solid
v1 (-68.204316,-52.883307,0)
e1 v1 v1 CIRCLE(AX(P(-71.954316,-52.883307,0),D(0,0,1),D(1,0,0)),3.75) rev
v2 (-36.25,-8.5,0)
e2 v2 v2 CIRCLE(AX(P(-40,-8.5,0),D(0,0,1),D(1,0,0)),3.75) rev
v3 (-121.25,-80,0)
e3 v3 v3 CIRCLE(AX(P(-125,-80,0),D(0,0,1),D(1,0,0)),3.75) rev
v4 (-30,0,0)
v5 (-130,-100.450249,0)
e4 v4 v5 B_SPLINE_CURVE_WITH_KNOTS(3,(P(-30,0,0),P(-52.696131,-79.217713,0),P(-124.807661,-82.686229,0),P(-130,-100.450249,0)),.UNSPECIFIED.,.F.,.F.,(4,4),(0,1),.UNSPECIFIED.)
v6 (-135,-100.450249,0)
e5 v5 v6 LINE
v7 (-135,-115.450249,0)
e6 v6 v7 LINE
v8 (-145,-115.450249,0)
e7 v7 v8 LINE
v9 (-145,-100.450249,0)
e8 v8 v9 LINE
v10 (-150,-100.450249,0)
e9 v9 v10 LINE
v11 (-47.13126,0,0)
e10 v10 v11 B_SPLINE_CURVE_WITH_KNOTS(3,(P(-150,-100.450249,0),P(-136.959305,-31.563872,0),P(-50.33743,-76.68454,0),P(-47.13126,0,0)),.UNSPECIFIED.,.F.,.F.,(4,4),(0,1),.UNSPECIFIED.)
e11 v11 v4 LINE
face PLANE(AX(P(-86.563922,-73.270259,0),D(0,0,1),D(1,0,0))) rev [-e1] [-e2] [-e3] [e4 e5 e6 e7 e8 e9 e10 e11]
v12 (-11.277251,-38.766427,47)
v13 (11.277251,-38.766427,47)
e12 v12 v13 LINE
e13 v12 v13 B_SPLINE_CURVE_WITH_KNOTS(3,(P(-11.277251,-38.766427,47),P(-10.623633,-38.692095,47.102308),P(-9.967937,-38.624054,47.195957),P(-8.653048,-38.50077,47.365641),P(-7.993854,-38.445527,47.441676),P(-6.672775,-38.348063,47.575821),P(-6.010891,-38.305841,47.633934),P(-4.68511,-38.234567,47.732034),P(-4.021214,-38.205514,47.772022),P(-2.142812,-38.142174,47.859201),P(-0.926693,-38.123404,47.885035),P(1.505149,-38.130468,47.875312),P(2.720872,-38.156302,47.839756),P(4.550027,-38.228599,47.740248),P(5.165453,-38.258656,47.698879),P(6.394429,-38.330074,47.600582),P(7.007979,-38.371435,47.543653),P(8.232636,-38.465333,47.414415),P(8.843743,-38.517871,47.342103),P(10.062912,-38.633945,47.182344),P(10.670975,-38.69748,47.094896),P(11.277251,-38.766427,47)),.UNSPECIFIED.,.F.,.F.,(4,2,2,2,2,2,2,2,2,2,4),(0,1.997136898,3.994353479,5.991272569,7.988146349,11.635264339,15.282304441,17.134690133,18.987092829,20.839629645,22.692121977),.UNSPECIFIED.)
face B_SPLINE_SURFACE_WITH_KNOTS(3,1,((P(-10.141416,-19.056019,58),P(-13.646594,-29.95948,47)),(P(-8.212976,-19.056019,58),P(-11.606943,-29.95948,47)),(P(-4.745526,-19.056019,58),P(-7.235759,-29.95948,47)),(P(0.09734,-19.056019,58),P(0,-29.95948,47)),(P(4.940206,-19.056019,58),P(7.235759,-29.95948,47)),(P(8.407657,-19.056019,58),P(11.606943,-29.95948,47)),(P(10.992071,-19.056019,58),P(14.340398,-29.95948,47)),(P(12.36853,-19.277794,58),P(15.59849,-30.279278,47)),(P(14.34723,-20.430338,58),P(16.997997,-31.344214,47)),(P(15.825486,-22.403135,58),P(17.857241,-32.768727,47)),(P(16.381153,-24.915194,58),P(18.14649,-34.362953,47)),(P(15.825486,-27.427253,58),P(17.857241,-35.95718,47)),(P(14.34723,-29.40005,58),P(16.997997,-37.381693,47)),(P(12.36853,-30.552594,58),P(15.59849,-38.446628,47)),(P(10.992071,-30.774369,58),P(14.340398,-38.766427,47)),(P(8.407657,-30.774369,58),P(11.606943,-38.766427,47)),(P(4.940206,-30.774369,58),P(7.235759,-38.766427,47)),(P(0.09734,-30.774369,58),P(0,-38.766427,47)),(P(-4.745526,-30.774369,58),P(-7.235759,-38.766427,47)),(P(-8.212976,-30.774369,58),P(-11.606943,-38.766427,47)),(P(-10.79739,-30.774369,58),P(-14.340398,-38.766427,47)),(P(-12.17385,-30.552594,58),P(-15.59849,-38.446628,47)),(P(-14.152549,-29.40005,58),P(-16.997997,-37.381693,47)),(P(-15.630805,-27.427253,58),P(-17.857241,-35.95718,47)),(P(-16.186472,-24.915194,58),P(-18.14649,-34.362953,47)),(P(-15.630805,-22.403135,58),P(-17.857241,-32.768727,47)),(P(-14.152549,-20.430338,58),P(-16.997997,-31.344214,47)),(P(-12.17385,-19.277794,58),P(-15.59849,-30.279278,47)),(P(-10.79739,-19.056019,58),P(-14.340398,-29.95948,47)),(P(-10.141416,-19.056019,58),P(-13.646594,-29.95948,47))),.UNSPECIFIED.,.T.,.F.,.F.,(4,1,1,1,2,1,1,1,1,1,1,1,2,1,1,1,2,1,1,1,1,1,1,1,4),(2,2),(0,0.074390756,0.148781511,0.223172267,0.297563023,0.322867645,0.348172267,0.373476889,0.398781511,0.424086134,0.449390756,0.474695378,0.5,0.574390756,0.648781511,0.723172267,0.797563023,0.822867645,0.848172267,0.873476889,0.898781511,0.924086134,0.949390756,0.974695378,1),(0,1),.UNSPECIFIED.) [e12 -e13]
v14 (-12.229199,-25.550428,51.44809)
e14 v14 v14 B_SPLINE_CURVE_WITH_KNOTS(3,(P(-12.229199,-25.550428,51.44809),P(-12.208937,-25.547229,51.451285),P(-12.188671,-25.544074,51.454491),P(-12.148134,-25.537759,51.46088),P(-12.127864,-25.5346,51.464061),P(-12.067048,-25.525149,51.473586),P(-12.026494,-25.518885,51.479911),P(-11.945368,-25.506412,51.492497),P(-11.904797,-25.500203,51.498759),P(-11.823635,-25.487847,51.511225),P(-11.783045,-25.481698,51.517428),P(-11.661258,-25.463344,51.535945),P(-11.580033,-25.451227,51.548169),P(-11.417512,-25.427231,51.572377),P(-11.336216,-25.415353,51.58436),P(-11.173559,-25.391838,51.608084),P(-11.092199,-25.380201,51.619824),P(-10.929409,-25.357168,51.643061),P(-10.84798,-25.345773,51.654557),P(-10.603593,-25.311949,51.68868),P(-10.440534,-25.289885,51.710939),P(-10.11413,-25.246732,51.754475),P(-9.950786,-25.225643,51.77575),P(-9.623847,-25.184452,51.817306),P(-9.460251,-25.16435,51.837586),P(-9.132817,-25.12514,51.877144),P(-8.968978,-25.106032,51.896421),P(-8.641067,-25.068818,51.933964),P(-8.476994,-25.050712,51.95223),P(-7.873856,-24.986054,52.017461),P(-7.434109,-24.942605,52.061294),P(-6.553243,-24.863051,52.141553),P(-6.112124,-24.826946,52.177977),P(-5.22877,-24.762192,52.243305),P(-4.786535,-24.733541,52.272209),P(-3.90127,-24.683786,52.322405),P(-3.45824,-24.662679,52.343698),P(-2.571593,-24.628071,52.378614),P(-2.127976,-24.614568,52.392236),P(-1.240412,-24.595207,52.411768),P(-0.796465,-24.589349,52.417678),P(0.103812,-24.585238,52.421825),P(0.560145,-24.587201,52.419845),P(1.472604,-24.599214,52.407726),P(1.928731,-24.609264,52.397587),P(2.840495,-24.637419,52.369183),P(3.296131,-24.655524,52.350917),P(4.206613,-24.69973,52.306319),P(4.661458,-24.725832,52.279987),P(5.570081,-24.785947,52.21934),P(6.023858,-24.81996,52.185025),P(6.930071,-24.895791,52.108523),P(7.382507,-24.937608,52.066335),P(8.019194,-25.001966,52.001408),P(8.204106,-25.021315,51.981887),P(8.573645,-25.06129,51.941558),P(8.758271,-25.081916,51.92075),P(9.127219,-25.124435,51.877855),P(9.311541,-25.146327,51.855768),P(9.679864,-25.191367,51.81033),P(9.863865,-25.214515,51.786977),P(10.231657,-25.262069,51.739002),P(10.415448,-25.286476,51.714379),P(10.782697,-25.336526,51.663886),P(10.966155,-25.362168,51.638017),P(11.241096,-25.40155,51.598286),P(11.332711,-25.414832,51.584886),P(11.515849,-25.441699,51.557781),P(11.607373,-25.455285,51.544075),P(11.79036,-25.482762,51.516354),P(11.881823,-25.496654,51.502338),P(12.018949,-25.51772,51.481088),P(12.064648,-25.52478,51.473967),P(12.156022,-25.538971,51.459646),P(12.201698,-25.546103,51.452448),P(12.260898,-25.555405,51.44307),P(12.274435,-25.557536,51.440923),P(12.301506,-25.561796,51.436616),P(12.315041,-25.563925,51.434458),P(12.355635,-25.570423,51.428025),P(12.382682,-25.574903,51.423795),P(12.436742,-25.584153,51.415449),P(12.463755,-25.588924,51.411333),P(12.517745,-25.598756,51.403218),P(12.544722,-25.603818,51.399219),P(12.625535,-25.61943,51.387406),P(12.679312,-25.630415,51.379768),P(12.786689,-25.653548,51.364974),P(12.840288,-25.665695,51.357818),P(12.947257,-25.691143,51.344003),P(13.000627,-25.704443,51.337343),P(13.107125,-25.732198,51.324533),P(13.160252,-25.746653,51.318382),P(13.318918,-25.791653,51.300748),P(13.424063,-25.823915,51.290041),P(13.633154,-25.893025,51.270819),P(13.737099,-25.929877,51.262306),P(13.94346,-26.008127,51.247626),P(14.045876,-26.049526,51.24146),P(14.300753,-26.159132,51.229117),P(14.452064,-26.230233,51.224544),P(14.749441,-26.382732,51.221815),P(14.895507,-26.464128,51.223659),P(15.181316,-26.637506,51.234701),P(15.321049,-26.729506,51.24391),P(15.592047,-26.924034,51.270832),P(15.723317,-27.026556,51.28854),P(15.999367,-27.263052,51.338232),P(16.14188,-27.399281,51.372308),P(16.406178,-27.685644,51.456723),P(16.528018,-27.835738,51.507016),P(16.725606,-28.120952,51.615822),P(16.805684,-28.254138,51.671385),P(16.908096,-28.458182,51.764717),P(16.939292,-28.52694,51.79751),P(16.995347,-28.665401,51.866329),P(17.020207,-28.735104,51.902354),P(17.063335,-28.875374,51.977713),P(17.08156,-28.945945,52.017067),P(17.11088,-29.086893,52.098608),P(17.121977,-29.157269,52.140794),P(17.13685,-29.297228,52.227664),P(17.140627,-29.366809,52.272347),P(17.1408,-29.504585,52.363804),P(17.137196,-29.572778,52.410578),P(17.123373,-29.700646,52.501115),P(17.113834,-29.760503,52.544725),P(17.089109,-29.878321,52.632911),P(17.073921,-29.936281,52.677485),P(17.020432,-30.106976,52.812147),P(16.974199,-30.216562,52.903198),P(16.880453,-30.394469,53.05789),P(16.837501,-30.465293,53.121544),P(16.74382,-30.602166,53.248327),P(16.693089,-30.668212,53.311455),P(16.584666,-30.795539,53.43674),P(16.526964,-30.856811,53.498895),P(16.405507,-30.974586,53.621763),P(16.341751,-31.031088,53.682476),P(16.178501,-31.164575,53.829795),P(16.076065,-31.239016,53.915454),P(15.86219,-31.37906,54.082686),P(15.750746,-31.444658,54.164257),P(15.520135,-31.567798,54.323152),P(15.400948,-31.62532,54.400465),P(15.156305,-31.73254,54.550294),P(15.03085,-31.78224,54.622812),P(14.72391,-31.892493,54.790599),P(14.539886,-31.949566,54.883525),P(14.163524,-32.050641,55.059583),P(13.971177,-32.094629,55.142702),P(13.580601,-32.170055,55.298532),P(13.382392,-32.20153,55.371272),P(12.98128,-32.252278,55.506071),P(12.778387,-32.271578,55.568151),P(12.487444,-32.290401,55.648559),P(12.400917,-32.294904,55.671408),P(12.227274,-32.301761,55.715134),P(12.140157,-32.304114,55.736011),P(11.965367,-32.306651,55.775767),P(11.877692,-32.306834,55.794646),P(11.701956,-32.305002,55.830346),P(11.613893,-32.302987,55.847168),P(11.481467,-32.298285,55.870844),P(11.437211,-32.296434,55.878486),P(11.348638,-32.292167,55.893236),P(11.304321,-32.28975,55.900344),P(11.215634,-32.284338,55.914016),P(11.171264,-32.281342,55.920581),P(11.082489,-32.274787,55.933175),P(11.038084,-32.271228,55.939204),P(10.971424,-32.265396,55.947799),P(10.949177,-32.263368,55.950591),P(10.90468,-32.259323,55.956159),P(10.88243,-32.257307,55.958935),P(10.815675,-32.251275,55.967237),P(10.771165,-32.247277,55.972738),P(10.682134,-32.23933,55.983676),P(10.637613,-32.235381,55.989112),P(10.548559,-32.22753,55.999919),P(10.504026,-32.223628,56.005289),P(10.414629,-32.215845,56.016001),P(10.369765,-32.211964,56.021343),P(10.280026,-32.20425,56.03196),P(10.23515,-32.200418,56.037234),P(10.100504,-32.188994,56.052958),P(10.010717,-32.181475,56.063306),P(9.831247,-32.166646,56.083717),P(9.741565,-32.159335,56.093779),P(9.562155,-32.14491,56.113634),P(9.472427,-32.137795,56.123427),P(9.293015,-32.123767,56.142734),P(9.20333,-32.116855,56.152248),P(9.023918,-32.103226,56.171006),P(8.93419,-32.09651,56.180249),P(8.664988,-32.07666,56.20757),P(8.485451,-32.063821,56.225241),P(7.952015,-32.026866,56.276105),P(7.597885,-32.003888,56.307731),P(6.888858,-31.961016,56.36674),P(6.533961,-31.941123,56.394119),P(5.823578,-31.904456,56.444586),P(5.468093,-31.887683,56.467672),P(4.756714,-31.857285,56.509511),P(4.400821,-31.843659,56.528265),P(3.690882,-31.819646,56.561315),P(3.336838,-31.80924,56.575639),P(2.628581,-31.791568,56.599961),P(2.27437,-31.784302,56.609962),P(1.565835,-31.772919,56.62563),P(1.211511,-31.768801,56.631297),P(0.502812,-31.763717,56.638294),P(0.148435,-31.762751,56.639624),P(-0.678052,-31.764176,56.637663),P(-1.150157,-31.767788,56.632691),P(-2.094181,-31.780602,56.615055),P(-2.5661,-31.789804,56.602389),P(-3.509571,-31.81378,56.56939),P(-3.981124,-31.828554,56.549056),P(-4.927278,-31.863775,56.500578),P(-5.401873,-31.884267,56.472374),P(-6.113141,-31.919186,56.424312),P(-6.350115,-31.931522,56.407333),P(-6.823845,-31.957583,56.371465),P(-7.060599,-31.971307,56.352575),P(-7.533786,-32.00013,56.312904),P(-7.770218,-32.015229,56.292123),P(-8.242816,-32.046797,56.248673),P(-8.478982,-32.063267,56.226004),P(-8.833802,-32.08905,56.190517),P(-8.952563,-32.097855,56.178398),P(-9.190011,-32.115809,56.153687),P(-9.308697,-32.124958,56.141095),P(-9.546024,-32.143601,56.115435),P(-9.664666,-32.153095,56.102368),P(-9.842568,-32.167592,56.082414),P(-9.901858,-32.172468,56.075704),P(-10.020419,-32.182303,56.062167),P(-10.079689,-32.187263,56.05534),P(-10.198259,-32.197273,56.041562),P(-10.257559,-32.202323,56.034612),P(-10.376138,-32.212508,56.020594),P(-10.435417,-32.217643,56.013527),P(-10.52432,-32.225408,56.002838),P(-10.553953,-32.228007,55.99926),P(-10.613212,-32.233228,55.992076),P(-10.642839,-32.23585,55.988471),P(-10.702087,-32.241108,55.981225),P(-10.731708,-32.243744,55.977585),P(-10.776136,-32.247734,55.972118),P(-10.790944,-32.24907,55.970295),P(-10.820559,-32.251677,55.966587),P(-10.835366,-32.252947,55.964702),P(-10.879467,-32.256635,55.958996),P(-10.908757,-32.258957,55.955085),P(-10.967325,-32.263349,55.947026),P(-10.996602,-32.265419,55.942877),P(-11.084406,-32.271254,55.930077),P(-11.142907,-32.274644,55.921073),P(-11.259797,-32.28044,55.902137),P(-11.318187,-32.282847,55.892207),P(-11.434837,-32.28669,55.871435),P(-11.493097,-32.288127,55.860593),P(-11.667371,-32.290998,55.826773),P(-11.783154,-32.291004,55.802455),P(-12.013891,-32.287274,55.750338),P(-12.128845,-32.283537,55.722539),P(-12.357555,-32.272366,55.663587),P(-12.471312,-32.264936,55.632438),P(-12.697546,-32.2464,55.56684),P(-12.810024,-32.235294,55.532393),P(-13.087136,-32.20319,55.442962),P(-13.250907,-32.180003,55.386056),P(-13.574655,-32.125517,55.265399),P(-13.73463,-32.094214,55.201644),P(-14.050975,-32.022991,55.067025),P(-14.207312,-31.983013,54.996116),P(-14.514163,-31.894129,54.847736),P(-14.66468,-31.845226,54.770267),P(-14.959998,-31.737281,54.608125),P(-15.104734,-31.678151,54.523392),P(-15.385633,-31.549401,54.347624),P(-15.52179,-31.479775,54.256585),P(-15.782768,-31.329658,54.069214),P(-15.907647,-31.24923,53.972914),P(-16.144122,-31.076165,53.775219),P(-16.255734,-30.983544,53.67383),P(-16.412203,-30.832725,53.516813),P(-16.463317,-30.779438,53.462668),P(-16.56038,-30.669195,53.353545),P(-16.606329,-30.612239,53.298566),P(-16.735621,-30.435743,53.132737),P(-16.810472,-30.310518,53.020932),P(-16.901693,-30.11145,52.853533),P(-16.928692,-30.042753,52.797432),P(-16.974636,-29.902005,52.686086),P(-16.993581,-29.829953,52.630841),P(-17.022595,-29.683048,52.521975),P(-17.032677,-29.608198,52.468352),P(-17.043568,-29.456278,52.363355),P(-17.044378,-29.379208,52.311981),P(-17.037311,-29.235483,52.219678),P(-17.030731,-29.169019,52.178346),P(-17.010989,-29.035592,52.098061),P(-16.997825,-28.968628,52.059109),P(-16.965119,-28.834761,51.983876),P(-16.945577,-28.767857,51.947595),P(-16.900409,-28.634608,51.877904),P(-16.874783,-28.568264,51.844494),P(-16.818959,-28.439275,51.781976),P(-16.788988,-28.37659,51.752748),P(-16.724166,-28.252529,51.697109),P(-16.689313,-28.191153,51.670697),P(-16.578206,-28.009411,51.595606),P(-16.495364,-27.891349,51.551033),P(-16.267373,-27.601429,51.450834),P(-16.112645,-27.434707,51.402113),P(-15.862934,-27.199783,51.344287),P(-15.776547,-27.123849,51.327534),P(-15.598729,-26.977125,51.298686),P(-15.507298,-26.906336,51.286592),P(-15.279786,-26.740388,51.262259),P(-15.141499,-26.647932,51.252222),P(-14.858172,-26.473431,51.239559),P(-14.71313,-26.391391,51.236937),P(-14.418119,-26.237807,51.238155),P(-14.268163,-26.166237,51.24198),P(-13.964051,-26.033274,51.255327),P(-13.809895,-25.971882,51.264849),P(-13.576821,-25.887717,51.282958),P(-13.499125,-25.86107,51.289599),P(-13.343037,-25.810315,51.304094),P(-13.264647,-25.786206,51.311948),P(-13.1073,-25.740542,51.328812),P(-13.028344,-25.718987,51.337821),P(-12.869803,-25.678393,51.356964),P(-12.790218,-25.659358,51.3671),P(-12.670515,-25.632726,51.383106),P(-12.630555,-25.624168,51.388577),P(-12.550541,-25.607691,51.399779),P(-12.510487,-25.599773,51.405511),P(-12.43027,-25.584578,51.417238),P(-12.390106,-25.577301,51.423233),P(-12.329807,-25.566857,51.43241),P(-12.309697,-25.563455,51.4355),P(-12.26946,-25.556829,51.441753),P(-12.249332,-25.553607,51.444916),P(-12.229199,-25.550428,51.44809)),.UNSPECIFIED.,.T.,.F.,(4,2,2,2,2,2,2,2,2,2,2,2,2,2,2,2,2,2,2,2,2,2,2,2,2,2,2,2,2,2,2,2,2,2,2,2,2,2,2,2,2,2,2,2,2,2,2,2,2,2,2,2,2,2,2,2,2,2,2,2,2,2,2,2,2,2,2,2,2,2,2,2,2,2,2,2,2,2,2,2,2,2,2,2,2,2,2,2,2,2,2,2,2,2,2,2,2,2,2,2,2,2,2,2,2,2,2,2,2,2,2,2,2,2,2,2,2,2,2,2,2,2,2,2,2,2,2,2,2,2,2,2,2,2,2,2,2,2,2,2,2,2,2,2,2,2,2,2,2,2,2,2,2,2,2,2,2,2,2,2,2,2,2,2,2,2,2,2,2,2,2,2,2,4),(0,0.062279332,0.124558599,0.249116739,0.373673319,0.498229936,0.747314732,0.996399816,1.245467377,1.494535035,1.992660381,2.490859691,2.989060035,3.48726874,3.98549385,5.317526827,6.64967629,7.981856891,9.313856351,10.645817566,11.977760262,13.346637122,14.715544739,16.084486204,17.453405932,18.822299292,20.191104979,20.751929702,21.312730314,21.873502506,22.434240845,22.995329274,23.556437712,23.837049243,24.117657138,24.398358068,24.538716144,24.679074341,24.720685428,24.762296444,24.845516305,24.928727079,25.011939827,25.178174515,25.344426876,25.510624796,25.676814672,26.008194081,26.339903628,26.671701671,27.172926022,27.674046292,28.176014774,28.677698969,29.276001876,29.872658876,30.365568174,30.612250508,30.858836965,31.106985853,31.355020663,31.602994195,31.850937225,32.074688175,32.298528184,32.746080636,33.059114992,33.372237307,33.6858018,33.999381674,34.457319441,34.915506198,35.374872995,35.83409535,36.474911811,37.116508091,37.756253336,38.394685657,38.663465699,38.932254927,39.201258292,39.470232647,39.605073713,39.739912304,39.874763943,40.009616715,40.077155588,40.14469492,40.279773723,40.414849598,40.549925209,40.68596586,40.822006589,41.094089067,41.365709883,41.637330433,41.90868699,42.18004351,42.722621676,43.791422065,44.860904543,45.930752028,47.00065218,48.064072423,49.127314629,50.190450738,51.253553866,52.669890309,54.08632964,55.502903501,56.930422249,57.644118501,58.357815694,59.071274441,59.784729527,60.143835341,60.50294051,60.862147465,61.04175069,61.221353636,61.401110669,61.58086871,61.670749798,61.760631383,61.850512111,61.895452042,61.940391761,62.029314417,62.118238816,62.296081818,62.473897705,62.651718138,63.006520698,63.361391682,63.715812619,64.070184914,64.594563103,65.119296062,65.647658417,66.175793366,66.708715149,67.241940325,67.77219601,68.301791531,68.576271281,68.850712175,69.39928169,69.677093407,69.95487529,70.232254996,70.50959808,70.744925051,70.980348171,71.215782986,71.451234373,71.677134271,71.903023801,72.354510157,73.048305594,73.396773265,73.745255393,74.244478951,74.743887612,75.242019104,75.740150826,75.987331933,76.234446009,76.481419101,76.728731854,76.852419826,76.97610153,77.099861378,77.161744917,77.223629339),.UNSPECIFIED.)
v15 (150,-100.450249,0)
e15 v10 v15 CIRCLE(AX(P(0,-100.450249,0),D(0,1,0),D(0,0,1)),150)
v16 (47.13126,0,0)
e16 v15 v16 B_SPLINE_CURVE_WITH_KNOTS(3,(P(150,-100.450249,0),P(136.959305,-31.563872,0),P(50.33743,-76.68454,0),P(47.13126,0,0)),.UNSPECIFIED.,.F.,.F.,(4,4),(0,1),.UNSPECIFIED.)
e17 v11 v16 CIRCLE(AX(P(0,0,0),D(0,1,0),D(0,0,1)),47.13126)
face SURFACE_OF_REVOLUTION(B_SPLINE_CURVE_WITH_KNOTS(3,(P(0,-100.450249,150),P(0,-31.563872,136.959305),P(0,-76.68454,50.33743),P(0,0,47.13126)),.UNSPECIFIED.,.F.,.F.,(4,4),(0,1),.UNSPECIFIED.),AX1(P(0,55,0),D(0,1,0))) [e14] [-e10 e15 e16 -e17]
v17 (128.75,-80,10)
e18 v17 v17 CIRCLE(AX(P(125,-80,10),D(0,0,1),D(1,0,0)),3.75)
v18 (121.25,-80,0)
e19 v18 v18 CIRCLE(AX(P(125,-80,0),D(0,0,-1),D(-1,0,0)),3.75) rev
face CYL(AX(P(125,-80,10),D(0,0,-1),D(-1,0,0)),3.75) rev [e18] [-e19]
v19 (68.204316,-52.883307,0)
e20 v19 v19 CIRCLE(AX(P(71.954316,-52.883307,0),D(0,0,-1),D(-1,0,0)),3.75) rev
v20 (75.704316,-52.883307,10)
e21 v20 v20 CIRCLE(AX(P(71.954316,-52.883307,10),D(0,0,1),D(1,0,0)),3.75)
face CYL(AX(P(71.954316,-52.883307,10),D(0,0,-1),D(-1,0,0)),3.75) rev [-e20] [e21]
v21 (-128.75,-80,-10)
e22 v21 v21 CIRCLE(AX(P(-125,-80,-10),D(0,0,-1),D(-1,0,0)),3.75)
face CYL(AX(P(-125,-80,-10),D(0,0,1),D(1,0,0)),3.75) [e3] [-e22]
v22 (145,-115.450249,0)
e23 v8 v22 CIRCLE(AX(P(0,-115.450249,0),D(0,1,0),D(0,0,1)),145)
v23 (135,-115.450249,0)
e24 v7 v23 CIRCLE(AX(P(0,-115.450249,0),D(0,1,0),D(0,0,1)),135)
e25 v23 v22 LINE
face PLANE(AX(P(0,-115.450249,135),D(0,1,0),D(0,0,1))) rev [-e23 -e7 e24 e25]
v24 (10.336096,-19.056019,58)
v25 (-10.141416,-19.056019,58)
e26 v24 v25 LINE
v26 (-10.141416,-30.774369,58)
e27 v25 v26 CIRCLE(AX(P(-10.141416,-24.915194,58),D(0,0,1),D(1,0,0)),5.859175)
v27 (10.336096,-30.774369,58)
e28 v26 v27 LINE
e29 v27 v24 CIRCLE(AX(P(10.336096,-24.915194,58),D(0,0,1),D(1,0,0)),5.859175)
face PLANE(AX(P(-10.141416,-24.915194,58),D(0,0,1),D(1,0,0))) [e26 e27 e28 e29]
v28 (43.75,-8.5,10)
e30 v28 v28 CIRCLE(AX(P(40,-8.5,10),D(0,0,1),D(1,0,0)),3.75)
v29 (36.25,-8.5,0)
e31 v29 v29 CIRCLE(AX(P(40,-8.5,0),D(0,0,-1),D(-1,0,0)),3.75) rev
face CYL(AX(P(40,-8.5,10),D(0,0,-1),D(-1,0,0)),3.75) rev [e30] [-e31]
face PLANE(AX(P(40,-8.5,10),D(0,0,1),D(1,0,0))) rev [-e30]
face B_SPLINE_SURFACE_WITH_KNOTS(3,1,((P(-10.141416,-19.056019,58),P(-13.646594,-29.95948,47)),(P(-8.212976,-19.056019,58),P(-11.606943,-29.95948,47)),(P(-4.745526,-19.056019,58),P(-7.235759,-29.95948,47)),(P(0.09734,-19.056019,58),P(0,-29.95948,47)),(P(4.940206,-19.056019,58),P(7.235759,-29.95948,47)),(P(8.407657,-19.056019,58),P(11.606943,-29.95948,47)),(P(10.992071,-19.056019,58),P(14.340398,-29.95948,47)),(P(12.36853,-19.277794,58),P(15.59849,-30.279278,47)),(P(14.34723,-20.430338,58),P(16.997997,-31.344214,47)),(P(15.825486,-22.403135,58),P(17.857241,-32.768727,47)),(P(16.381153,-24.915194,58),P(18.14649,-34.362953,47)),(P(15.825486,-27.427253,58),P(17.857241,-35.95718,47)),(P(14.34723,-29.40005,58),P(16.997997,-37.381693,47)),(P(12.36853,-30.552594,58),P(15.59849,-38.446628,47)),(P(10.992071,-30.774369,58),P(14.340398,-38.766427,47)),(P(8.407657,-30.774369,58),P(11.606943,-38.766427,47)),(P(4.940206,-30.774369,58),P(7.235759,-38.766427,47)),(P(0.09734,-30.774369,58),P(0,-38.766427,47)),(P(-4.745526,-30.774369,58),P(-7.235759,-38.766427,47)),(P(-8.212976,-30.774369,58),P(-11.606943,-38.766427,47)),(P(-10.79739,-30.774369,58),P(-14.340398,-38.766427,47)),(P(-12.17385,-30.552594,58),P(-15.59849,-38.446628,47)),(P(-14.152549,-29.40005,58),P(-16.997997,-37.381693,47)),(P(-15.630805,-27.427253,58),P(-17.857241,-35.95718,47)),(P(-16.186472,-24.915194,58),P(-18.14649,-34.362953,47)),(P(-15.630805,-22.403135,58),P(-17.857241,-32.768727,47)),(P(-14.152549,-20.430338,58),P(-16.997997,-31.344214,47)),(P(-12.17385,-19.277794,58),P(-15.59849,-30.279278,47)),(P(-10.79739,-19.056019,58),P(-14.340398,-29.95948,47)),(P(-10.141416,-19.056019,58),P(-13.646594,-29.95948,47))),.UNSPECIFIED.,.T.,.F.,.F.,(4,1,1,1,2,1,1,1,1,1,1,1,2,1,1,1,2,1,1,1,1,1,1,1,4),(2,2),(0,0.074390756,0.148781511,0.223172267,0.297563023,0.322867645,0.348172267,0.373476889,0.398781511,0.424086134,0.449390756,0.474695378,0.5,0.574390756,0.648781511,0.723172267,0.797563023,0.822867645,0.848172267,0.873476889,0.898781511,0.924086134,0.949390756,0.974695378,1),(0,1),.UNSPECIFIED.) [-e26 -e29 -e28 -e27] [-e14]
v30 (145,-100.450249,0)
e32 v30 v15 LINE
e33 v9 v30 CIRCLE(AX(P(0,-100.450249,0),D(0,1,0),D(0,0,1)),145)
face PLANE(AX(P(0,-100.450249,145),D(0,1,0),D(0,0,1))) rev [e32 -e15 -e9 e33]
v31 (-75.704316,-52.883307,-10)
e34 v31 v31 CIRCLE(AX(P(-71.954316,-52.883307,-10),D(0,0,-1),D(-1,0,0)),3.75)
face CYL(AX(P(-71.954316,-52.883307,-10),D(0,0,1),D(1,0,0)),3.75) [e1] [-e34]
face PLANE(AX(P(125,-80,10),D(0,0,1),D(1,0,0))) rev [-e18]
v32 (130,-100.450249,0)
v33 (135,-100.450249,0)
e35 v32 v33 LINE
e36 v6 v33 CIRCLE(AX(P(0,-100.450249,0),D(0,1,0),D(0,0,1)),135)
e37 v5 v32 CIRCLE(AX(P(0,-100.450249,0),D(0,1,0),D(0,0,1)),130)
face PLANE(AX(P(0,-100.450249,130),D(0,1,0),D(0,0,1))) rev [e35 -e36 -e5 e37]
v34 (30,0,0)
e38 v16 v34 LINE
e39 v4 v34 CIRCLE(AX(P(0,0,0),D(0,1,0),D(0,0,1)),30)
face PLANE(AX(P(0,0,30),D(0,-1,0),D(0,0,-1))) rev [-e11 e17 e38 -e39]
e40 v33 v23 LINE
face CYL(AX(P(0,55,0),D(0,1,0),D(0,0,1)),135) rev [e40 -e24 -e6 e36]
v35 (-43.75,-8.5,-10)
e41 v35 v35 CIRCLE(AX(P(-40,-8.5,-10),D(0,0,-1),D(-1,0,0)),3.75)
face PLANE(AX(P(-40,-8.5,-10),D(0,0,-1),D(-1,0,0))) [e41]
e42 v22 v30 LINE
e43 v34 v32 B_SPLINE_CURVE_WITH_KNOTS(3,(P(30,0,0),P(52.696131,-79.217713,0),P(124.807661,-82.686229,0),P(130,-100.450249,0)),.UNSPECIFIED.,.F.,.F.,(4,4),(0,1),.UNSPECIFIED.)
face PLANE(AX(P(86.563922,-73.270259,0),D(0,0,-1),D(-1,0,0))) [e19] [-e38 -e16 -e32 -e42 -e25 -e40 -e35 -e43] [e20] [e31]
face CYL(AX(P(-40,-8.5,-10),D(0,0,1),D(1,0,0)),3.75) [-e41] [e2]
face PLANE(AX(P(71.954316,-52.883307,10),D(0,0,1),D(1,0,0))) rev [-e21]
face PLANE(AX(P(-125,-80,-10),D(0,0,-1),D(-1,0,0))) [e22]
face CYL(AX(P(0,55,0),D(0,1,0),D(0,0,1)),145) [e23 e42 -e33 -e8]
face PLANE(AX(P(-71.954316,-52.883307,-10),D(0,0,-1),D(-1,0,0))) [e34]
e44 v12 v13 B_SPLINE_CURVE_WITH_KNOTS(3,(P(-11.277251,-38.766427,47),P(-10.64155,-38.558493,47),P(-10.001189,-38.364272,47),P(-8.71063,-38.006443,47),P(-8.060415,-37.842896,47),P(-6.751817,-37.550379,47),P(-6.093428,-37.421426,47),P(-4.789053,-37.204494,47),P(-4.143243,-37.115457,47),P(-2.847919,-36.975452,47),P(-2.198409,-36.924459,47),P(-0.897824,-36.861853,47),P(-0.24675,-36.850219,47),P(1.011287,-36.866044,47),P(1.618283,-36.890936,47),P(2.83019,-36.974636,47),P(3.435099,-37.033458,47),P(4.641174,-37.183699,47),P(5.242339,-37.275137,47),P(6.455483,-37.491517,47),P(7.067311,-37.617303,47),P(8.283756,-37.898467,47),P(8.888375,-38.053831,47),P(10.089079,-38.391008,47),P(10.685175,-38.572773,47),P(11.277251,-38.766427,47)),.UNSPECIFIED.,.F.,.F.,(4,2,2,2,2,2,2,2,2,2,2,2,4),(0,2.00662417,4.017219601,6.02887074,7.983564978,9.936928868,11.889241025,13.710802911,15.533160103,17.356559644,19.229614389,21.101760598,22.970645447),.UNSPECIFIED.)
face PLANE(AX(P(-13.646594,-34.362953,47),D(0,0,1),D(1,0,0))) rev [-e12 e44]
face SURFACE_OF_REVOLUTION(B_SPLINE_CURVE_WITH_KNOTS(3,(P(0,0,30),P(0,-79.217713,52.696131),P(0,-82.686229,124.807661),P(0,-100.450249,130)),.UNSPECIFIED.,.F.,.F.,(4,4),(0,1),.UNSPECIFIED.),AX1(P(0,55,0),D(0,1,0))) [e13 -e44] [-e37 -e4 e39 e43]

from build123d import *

# Parameters (mm, degrees)
R_VOLUTION1_ANGLE            = 90
ESQUISSE6_R                  = 3.75
BOSS_EXTRU_1_DEPTH           = 10
R_P_TITION_CIRCULAIRE2_COUNT = 2
R_P_TITION_CIRCULAIRE2_ANGLE = 270
R_P_TITION_CIRCULAIRE3_COUNT = 2
R_P_TITION_CIRCULAIRE3_ANGLE = 90


with BuildPart() as part:
    # Esquisse2 → Révolution1 (revolve)
    with BuildSketch(Plane.XY):
        with BuildLine():
            Line((30, 0), (47.131260288, 0))
            add(Edge.make_bspline(
                [(47.131260288, 0), (50.337430192, -76.684539626), (136.959304806, -31.563871951), (150, -100.45024926)],
                knots=[0, 0, 0, 0, 1, 1, 1, 1], degree=3))
            Line((150, -100.45024926), (145, -100.45024926))
            Line((145, -100.45024926), (145, -115.45024926))
            Line((145, -115.45024926), (135, -115.45024926))
            Line((135, -115.45024926), (135, -100.45024926))
            Line((135, -100.45024926), (130, -100.45024926))
            add(Edge.make_bspline(
                [(30, 0), (52.696130576, -79.217712587), (124.807660959, -82.686229226), (130, -100.45024926)],
                knots=[0, 0, 0, 0, 1, 1, 1, 1], degree=3))
        make_face()
    revolve(axis=Axis((0, 55, 0), (0, -1, 0)), revolution_arc=R_VOLUTION1_ANGLE)

    # Esquisse6 → Boss.-Extru.1 (add)
    with BuildSketch(Plane.ZY):
        with Locations(Location((40, -8.5, 0), (0, 0, 180))):
            Circle(ESQUISSE6_R)
        with Locations(Location((71.95431642, -52.883306602, 0), (0, 0, 180))):
            Circle(ESQUISSE6_R)
        with Locations(Location((125, -80, 0), (0, 0, 180))):
            Circle(ESQUISSE6_R)
    extrude(amount=BOSS_EXTRU_1_DEPTH)


with BuildPart() as r_p_tition_circulaire2_1:
    # Répétition circulaire2: pattern copy
    add(part.part.rotate(Axis((0, 55, 0), (0, -1, 0)), 1 * R_P_TITION_CIRCULAIRE2_ANGLE / (R_P_TITION_CIRCULAIRE2_COUNT - 1)))


with BuildPart() as part_1:
    add(part.part)

    # Combiner3: cut Répétition circulaire2_1
    add(r_p_tition_circulaire2_1.part, mode=Mode.SUBTRACT)


with BuildPart() as r_p_tition_circulaire3_1:
    # Répétition circulaire3: pattern copy
    add(part_1.part.rotate(Axis((0, 55, 0), (0, -1, 0)), 1 * R_P_TITION_CIRCULAIRE3_ANGLE / (R_P_TITION_CIRCULAIRE3_COUNT - 1)))


with BuildPart() as part_2:
    add(part_1.part)

    # Combiner4: union Répétition circulaire3_1
    add(r_p_tition_circulaire3_1.part)

    # Lissage2: read off the stored shape, not the designer's step
    # Lissage2: loft between two sections, ruled curve by curve
    lissage2_from = [
        Edge.make_bspline([(-10.141415638, -19.056019087, 58), (-8.212976489, -19.056019087, 58), (-4.745525631, -19.056019087, 58), (0.097340365, -19.056019087, 58), (4.940206361, -19.056019087, 58), (8.407657219, -19.056019087, 58), (10.992070669, -19.056019087, 58), (12.368530298, -19.277794454, 58), (14.347229759, -20.43033769, 58), (15.825485799, -22.4031348, 58), (16.381152507, -24.915194071, 58), (15.825485799, -27.427253342, 58), (14.347229759, -29.400050453, 58), (12.368530298, -30.552593688, 58), (10.992070669, -30.774369055, 58), (8.407657219, -30.774369055, 58), (4.940206361, -30.774369055, 58), (0.097340365, -30.774369055, 58), (-4.745525631, -30.774369055, 58), (-8.212976489, -30.774369055, 58), (-10.797389939, -30.774369055, 58), (-12.173849568, -30.552593688, 58), (-14.152549029, -29.400050453, 58), (-15.630805069, -27.427253342, 58), (-16.186471777, -24.915194071, 58), (-15.630805069, -22.4031348, 58), (-14.152549029, -20.43033769, 58), (-12.173849568, -19.277794454, 58), (-10.797389939, -19.056019087, 58), (-10.141415638, -19.056019087, 58)], [0, 0, 0, 0, 0.074390756, 0.148781511, 0.223172267, 0.297563023, 0.297563023, 0.322867645, 0.348172267, 0.373476889, 0.398781511, 0.424086134, 0.449390756, 0.474695378, 0.5, 0.5, 0.574390756, 0.648781511, 0.723172267, 0.797563023, 0.797563023, 0.822867645, 0.848172267, 0.873476889, 0.898781511, 0.924086134, 0.949390756, 0.974695378, 1, 1, 1, 1], 3),
    ]
    lissage2_to = [
        Edge.make_bspline([(-13.646593818, -29.959479994, 47), (-11.606942776, -29.959479994, 47), (-7.235758652, -29.959479994, 47), (0, -29.959479994, 47), (7.235758652, -29.959479994, 47), (11.606942776, -29.959479994, 47), (14.340397752, -29.959479994, 47), (15.598489603, -30.279278409, 47), (16.997996562, -31.3442136, 47), (17.857241012, -32.768726587, 47), (18.146490081, -34.362953291, 47), (17.857241012, -35.957179995, 47), (16.997996562, -37.381692982, 47), (15.598489603, -38.446628173, 47), (14.340397752, -38.766426588, 47), (11.606942776, -38.766426588, 47), (7.235758652, -38.766426588, 47), (0, -38.766426588, 47), (-7.235758652, -38.766426588, 47), (-11.606942776, -38.766426588, 47), (-14.340397752, -38.766426588, 47), (-15.598489603, -38.446628173, 47), (-16.997996562, -37.381692982, 47), (-17.857241012, -35.957179995, 47), (-18.146490081, -34.362953291, 47), (-17.857241012, -32.768726587, 47), (-16.997996562, -31.3442136, 47), (-15.598489603, -30.279278409, 47), (-14.340397752, -29.959479994, 47), (-13.646593818, -29.959479994, 47)], [0, 0, 0, 0, 0.074390756, 0.148781511, 0.223172267, 0.297563023, 0.297563023, 0.322867645, 0.348172267, 0.373476889, 0.398781511, 0.424086134, 0.449390756, 0.474695378, 0.5, 0.5, 0.574390756, 0.648781511, 0.723172267, 0.797563023, 0.797563023, 0.822867645, 0.848172267, 0.873476889, 0.898781511, 0.924086134, 0.949390756, 0.974695378, 1, 1, 1, 1], 3),
    ]
    lissage2 = Solid(Shell([*[Face.make_surface_from_curves(lissage2_from[k], lissage2_to[k]) for k in range(1)], Face(Wire(lissage2_from)), Face(Wire(lissage2_to))]))
    add(lissage2)

    # Lissage2 2: loft between two sections, ruled curve by curve
    lissage2_2_from = [
        Edge.make_bspline([(-10.141415638, -19.056019087, 58), (-8.212976489, -19.056019087, 58), (-4.745525631, -19.056019087, 58), (0.097340365, -19.056019087, 58), (4.940206361, -19.056019087, 58), (8.407657219, -19.056019087, 58), (10.992070669, -19.056019087, 58), (12.368530298, -19.277794454, 58), (14.347229759, -20.43033769, 58), (15.825485799, -22.4031348, 58), (16.381152507, -24.915194071, 58), (15.825485799, -27.427253342, 58), (14.347229759, -29.400050453, 58), (12.368530298, -30.552593688, 58), (10.992070669, -30.774369055, 58), (8.407657219, -30.774369055, 58), (4.940206361, -30.774369055, 58), (0.097340365, -30.774369055, 58), (-4.745525631, -30.774369055, 58), (-8.212976489, -30.774369055, 58), (-10.797389939, -30.774369055, 58), (-12.173849568, -30.552593688, 58), (-14.152549029, -29.400050453, 58), (-15.630805069, -27.427253342, 58), (-16.186471777, -24.915194071, 58), (-15.630805069, -22.4031348, 58), (-14.152549029, -20.43033769, 58), (-12.173849568, -19.277794454, 58), (-10.797389939, -19.056019087, 58), (-10.141415638, -19.056019087, 58)], [0, 0, 0, 0, 0.074390756, 0.148781511, 0.223172267, 0.297563023, 0.297563023, 0.322867645, 0.348172267, 0.373476889, 0.398781511, 0.424086134, 0.449390756, 0.474695378, 0.5, 0.5, 0.574390756, 0.648781511, 0.723172267, 0.797563023, 0.797563023, 0.822867645, 0.848172267, 0.873476889, 0.898781511, 0.924086134, 0.949390756, 0.974695378, 1, 1, 1, 1], 3),
    ]
    lissage2_2_to = [
        Edge.make_bspline([(-13.646593818, -29.959479994, 47), (-11.606942776, -29.959479994, 47), (-7.235758652, -29.959479994, 47), (0, -29.959479994, 47), (7.235758652, -29.959479994, 47), (11.606942776, -29.959479994, 47), (14.340397752, -29.959479994, 47), (15.598489603, -30.279278409, 47), (16.997996562, -31.3442136, 47), (17.857241012, -32.768726587, 47), (18.146490081, -34.362953291, 47), (17.857241012, -35.957179995, 47), (16.997996562, -37.381692982, 47), (15.598489603, -38.446628173, 47), (14.340397752, -38.766426588, 47), (11.606942776, -38.766426588, 47), (7.235758652, -38.766426588, 47), (0, -38.766426588, 47), (-7.235758652, -38.766426588, 47), (-11.606942776, -38.766426588, 47), (-14.340397752, -38.766426588, 47), (-15.598489603, -38.446628173, 47), (-16.997996562, -37.381692982, 47), (-17.857241012, -35.957179995, 47), (-18.146490081, -34.362953291, 47), (-17.857241012, -32.768726587, 47), (-16.997996562, -31.3442136, 47), (-15.598489603, -30.279278409, 47), (-14.340397752, -29.959479994, 47), (-13.646593818, -29.959479994, 47)], [0, 0, 0, 0, 0.074390756, 0.148781511, 0.223172267, 0.297563023, 0.297563023, 0.322867645, 0.348172267, 0.373476889, 0.398781511, 0.424086134, 0.449390756, 0.474695378, 0.5, 0.5, 0.574390756, 0.648781511, 0.723172267, 0.797563023, 0.797563023, 0.822867645, 0.848172267, 0.873476889, 0.898781511, 0.924086134, 0.949390756, 0.974695378, 1, 1, 1, 1], 3),
    ]
    lissage2_2 = Solid(Shell([*[Face.make_surface_from_curves(lissage2_2_from[k], lissage2_2_to[k]) for k in range(1)], Face(Wire(lissage2_2_from)), Face(Wire(lissage2_2_to))]))
    add(lissage2_2)


solid = part_2.part
